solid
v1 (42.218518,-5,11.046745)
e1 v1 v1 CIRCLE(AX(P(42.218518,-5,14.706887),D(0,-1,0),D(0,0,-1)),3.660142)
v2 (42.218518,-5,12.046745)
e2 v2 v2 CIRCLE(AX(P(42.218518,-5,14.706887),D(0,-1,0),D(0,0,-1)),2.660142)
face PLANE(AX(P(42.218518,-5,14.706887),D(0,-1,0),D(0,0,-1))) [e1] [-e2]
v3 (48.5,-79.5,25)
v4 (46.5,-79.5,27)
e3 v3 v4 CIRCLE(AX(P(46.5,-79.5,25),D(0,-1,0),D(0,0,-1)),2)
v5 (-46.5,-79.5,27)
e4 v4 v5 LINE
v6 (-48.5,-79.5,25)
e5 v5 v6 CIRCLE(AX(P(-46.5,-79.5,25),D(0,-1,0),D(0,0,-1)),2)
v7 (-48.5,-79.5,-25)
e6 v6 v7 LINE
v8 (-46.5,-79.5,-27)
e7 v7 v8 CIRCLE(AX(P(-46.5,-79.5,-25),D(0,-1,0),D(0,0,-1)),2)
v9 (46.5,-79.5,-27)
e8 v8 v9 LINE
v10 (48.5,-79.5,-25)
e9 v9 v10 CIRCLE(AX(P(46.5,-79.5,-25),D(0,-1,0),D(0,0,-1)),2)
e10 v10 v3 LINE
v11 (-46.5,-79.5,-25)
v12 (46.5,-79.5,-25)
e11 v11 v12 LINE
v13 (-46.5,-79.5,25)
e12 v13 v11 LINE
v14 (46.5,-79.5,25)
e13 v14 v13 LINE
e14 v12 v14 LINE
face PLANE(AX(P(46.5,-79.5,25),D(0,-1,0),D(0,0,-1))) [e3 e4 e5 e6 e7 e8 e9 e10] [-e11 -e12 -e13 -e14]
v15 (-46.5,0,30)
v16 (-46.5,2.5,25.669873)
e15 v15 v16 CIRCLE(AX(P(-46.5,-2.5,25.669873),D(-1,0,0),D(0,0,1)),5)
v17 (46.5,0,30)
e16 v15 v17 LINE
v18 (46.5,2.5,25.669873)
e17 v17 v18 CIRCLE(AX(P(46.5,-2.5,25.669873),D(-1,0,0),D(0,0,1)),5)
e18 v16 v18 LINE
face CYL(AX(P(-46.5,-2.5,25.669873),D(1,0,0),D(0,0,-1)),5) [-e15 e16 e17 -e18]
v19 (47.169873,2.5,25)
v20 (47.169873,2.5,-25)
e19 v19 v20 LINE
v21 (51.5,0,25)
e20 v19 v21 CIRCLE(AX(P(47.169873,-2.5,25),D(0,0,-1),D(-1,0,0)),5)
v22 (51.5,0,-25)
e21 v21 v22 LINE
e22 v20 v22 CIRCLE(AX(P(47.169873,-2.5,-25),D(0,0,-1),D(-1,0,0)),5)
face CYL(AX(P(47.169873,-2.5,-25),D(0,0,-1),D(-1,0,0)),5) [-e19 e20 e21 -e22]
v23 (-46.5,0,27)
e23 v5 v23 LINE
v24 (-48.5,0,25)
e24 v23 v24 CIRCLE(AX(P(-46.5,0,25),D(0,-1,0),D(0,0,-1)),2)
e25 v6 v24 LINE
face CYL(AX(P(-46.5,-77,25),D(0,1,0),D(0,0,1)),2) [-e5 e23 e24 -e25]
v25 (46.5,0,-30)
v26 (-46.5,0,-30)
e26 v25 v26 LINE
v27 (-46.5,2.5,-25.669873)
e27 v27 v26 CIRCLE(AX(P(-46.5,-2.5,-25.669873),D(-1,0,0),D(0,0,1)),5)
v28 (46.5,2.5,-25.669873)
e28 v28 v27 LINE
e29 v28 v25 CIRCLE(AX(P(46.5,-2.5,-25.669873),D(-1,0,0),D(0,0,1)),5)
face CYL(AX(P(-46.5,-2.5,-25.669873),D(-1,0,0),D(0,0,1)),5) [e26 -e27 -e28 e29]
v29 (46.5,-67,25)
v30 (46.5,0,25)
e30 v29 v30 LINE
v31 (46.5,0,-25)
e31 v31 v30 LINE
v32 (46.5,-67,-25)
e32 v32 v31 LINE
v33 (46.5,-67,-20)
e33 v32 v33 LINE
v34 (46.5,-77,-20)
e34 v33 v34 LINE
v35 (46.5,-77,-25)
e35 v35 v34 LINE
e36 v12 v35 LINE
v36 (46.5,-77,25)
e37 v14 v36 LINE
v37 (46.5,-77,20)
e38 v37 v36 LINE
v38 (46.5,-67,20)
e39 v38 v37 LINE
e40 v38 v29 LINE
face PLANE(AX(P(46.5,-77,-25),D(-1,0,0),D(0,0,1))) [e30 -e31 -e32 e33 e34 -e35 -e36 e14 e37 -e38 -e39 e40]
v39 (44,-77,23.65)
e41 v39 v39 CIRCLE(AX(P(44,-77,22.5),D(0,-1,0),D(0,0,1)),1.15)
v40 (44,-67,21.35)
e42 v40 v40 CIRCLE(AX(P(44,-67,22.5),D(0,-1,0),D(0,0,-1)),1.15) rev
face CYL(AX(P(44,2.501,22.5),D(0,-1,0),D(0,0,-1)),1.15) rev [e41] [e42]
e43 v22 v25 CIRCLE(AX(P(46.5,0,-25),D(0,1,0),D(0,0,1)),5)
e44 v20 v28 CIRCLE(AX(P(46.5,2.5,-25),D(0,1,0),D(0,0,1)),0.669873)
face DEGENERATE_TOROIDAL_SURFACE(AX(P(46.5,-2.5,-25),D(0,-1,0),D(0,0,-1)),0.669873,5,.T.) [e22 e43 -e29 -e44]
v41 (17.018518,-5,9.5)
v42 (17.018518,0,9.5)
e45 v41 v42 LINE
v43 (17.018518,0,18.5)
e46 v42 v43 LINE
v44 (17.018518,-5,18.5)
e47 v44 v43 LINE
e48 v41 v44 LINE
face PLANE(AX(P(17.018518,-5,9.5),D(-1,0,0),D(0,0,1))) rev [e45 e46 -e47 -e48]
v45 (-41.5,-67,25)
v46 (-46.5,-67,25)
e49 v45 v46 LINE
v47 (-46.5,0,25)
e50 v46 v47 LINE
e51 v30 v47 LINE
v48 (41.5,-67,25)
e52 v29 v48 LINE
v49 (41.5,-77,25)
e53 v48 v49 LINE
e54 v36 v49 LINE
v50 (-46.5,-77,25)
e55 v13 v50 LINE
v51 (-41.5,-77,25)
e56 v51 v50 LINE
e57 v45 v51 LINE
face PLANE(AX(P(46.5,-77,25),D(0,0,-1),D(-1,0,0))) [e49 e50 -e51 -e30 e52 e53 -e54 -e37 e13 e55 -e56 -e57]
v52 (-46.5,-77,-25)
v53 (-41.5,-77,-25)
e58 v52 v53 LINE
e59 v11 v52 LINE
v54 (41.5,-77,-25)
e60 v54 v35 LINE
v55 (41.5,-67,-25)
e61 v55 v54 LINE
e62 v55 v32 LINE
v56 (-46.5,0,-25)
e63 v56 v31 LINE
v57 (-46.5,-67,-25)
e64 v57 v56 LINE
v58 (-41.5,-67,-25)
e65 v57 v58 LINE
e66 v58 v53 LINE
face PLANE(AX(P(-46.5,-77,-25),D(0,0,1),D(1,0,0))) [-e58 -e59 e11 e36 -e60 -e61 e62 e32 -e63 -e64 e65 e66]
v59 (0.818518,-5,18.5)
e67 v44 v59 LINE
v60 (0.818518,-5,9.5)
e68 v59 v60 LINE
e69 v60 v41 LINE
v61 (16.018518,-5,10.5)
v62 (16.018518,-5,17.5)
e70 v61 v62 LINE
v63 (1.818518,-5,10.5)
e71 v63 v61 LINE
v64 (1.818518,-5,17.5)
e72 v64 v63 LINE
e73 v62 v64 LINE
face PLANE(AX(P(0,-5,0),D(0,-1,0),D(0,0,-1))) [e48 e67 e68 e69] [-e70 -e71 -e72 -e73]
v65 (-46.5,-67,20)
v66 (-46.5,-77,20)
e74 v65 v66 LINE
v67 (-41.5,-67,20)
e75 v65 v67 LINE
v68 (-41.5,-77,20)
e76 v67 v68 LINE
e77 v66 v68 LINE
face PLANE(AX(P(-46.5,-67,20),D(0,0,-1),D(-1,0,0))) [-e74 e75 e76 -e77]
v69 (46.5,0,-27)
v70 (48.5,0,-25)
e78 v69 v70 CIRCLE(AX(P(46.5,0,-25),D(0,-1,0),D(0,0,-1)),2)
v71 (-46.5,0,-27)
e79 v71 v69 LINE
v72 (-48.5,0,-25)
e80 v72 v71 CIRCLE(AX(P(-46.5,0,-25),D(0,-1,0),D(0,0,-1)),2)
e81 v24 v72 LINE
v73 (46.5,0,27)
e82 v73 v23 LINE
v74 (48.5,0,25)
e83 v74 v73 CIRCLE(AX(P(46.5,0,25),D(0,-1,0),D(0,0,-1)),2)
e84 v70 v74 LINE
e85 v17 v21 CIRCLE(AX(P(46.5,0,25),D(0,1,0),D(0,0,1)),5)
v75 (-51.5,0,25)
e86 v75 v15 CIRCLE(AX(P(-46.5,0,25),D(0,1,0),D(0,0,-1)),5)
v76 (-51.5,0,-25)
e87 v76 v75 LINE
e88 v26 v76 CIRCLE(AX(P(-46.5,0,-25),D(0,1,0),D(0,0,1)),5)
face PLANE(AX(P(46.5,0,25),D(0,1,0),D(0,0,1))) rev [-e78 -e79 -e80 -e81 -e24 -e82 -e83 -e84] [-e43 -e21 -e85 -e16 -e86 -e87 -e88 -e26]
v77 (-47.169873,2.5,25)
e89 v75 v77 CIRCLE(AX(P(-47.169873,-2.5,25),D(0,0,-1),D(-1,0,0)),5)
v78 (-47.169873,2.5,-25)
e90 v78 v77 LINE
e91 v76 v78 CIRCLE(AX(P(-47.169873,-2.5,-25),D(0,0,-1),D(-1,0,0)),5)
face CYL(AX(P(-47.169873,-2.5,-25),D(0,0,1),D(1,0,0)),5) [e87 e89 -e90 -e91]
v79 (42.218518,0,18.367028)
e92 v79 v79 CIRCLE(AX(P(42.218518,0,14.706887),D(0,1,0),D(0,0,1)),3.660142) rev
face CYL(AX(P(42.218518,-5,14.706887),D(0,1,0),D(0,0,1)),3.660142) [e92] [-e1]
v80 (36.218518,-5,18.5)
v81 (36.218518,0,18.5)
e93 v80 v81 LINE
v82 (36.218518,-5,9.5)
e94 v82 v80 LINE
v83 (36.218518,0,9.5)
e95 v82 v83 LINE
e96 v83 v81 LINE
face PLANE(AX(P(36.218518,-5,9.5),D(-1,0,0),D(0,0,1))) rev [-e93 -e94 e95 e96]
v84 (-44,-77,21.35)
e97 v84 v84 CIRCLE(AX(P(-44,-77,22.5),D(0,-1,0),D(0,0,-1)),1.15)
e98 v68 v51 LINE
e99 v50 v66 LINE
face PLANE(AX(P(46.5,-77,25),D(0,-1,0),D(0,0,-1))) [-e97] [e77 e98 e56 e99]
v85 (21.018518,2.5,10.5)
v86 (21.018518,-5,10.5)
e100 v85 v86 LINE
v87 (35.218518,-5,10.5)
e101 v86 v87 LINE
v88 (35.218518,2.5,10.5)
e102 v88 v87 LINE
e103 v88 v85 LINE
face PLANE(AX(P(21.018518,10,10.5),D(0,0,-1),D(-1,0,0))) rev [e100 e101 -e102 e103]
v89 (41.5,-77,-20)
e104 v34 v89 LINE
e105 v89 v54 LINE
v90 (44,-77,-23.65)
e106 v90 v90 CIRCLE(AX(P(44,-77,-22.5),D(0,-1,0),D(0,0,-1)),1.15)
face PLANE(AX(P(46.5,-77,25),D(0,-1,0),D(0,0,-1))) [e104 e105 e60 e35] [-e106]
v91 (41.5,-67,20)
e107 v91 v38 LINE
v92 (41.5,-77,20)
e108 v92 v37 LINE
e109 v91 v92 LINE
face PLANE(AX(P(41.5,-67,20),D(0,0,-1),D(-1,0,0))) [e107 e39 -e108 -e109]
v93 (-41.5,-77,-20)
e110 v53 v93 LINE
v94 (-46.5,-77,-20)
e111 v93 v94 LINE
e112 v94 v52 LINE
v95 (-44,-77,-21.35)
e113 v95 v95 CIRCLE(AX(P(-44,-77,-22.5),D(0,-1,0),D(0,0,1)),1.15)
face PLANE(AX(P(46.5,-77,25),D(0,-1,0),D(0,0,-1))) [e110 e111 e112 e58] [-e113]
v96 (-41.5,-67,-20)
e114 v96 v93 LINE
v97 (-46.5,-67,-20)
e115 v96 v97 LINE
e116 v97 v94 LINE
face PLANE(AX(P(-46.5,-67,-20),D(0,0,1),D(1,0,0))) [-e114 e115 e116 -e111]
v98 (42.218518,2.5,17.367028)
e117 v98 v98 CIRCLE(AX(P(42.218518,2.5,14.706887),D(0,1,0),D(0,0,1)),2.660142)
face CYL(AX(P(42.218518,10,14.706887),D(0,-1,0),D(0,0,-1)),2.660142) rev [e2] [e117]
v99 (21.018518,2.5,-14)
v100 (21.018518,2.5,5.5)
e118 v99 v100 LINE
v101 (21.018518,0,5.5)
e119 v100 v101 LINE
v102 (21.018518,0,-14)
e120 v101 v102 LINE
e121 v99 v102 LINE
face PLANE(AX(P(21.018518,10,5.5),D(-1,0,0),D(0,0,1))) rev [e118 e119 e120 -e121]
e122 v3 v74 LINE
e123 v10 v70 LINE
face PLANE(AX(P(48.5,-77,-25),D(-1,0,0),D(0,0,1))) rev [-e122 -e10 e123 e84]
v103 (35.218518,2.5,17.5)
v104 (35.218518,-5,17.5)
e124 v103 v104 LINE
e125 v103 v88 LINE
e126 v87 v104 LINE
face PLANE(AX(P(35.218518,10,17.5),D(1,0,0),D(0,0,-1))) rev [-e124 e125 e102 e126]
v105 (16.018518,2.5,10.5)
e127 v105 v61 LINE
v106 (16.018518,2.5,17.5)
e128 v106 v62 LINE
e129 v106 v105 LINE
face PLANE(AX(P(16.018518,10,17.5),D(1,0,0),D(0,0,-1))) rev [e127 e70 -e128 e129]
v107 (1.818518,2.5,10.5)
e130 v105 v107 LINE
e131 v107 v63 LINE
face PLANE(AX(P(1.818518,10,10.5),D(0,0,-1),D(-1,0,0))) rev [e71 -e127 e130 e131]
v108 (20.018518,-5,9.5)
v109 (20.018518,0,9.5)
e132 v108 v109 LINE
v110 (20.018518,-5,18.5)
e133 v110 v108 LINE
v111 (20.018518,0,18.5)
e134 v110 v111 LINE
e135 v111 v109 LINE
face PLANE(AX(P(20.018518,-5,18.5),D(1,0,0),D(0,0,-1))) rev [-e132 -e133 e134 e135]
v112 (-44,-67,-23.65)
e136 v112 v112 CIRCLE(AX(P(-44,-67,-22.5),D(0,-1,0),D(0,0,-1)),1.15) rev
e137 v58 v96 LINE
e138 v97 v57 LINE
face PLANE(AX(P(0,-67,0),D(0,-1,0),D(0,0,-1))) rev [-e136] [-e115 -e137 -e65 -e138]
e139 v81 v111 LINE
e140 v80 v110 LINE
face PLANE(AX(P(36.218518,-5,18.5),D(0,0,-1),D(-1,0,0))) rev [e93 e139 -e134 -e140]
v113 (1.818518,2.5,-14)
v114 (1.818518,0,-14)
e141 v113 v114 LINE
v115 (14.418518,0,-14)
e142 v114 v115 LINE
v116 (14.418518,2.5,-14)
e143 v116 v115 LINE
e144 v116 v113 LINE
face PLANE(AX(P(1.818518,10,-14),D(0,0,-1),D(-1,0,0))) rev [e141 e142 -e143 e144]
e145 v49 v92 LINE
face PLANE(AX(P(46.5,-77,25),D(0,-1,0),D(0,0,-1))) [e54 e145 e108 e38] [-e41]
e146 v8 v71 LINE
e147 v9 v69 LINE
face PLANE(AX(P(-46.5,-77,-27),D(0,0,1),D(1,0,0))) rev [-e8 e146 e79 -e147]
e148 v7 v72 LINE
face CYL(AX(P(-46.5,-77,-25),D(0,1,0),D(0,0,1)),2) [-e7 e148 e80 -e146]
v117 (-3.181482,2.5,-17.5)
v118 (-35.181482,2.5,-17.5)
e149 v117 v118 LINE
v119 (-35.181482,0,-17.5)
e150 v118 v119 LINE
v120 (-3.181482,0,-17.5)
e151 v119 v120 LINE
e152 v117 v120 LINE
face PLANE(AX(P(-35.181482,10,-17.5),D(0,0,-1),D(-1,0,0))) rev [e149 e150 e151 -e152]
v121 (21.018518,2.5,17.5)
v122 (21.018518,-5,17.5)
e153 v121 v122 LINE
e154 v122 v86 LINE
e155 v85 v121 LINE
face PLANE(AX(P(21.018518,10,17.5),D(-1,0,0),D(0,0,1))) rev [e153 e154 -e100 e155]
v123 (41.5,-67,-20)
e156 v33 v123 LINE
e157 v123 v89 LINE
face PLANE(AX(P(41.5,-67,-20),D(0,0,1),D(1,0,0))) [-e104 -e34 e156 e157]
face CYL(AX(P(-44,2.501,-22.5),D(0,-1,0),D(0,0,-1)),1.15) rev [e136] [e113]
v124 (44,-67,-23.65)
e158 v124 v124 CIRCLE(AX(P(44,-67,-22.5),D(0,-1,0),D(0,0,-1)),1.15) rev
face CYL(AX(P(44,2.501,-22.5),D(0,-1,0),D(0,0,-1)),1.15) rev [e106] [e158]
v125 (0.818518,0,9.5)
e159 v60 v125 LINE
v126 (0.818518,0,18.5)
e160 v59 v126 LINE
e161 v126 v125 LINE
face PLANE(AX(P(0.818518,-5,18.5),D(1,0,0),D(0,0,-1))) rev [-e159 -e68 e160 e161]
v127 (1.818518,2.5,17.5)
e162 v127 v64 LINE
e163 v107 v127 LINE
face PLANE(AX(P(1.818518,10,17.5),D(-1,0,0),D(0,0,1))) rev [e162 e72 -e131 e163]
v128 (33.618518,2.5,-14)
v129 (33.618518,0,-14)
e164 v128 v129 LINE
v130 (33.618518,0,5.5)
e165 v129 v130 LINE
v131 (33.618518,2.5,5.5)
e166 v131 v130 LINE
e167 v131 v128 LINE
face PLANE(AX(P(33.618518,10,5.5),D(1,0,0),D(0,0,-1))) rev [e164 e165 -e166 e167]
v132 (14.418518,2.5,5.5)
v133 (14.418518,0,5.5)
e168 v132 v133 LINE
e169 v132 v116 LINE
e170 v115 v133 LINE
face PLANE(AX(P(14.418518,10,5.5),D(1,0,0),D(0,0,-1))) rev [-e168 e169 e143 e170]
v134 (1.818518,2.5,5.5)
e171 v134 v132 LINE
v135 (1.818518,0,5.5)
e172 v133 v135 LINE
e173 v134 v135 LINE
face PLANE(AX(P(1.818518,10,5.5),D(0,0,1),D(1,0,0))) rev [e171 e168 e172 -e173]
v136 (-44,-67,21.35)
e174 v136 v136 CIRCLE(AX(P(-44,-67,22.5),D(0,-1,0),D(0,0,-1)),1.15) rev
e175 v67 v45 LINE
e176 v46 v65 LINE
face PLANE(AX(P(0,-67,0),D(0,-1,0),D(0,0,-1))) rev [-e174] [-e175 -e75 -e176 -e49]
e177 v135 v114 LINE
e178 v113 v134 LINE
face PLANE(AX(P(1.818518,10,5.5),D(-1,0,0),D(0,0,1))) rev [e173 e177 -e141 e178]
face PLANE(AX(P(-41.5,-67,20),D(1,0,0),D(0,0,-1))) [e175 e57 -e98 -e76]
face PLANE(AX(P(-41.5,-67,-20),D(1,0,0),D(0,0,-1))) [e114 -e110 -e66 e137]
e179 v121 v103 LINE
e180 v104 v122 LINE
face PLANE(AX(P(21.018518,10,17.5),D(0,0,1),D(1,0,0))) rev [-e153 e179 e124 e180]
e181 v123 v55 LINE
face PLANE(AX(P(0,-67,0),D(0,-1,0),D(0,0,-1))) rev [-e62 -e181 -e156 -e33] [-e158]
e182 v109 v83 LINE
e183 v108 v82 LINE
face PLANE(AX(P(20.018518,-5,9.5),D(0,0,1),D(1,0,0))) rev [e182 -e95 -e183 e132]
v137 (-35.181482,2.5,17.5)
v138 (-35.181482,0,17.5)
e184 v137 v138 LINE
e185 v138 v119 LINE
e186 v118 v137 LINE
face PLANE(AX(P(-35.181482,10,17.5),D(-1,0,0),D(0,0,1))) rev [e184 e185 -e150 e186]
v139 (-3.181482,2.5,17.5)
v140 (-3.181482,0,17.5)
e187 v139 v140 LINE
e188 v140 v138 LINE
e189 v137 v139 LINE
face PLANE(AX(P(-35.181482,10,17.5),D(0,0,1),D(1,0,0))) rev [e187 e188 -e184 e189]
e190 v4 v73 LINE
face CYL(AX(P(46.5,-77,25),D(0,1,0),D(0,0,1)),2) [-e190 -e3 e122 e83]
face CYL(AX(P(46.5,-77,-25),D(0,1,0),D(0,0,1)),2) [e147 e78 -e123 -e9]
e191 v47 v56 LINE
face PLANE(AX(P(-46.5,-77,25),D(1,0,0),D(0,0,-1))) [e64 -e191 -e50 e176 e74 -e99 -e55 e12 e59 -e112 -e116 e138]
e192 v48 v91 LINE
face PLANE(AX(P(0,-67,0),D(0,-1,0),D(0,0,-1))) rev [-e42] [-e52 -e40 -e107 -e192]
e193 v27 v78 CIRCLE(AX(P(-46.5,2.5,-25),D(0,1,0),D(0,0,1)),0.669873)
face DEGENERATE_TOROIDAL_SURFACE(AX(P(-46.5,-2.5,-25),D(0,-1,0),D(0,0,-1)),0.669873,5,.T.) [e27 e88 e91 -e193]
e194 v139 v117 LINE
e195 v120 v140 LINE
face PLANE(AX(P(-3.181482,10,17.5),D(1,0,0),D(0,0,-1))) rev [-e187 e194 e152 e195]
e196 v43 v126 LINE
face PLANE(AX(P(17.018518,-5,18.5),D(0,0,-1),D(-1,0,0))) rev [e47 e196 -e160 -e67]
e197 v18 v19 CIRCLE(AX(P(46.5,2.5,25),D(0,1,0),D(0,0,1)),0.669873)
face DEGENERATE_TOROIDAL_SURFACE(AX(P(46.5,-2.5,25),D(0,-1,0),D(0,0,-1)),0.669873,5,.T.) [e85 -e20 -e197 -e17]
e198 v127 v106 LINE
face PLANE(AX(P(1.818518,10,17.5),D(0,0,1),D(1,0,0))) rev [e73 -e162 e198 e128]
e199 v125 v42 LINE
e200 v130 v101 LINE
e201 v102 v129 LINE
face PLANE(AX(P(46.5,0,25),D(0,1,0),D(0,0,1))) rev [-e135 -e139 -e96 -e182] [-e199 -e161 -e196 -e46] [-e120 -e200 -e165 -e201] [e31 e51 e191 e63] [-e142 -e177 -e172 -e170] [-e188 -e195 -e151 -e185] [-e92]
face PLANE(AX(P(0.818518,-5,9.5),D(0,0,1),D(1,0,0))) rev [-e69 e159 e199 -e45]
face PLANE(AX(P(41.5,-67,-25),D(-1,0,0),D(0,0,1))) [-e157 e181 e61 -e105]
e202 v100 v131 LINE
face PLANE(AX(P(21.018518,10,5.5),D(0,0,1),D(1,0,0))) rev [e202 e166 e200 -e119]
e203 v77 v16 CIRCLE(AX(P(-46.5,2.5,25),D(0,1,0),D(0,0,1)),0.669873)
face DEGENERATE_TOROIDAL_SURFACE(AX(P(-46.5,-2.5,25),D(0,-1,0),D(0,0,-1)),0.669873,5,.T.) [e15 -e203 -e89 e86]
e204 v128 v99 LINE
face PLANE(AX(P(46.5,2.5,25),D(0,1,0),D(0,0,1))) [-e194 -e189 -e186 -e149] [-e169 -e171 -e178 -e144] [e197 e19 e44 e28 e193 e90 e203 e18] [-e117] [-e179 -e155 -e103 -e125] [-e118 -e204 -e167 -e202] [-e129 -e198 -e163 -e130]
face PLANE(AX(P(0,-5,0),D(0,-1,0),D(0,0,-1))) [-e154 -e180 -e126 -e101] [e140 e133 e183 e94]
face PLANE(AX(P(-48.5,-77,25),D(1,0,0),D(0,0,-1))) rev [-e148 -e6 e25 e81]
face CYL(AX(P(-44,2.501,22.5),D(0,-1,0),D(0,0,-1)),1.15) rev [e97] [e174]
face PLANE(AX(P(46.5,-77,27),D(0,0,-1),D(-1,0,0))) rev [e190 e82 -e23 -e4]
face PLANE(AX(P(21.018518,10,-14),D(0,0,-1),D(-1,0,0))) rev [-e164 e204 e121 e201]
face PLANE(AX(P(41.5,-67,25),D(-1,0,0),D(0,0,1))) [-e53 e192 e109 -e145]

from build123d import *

# Parameters (mm, degrees)
BOSS_EXTRUDE1_DEPTH = 2.5
FILLET1_R           = 5
SKETCH2_W           = 93
SKETCH2_H           = 50
BOSS_EXTRUDE2_DEPTH = 77
SKETCH8_R           = 2.660141884
SKETCH8_W           = 32
SKETCH8_H           = 35
SKETCH8_W_2         = 14.2
SKETCH8_H_2         = 7
SKETCH8_W_3         = 12.6
SKETCH8_H_3         = 19.5
CUT_EXTRUDE3_DEPTH  = 10
BOSS_EXTRUDE4_START = 5
SKETCH9_R           = 3.660141884
SKETCH9_R_2         = 2.660141884
SKETCH9_W           = 16.2
SKETCH9_H           = 9
SKETCH9_W_2         = 14.2
SKETCH9_H_2         = 7
BOSS_EXTRUDE4_DEPTH = 5
SKETCH10_W          = 5
SKETCH10_H          = 5
BOSS_EXTRUDE5_DEPTH = 10
SKETCH11_W          = 93
SKETCH11_H          = 50
BOSS_EXTRUDE6_DEPTH = 2.5
CUT_EXTRUDE4_REACH  = 101.36
SKETCH12_R          = 1.15


with BuildPart() as part:
    # Sketch1 → Boss-Extrude1 (new body)
    with BuildSketch(Plane(origin=(0, 0, 0), x_dir=(1, 0, 0), z_dir=(0, 1, 0))):
        with BuildLine():
            Line((-46.5, 30), (46.5, 30))
            ThreePointArc((46.5, 30), (50.035533906, 28.535533906), (51.5, 25))
            Line((51.5, 25), (51.5, -25))
            ThreePointArc((51.5, -25), (50.035533906, -28.535533906), (46.5, -30))
            Line((46.5, -30), (-46.5, -30))
            ThreePointArc((-46.5, -30), (-50.035533906, -28.535533906), (-51.5, -25))
            Line((-51.5, -25), (-51.5, 25))
            ThreePointArc((-51.5, 25), (-50.035533906, 28.535533906), (-46.5, 30))
        make_face()
    extrude(amount=BOSS_EXTRUDE1_DEPTH)

    # Fillet1
    # the kernel refuses this fillet: 5 mm, written as the material it takes off along each edge
    with BuildSketch(Plane(origin=(-46.5, 2.5, -25), x_dir=(-1, 0, 0), z_dir=(0, 0, 1))) as fillet1_piece_1:
        with BuildLine():
            CenterArc((0.669872981, 5), FILLET1_R, 270, 60)
            Line((0.669872981, 0), (0.669872981, -0.1))
            Line((0.669872981, -0.1), (5, -0.1))
            Line((5, -0.1), (5.1, 0))
            ThreePointArc((5.1, 0), (5.1, 1.25), (5.08660254, 2.45))
            Line((5.08660254, 2.45), (5, 2.5))
        make_face()
    revolve(axis=Axis((-46.5, 2.5, -25), (0, -1, 0)), revolution_arc=90, mode=Mode.SUBTRACT)
    with BuildSketch(Plane(origin=(-46.5, 2.5, -30), x_dir=(0, -1, 0), z_dir=(1, 0, 0)), Plane(origin=(46.5, 2.5, 30), x_dir=(0, -1, 0), z_dir=(-1, 0, 0))) as fillet1_piece_2:
        with BuildLine():
            CenterArc((5, -4.330127019), FILLET1_R, 120, 60)
            Line((0, -4.330127019), (-0.1, -4.330127019))
            Line((-0.1, -4.330127019), (-0.1, 0))
            Line((-0.1, 0), (0, 0.1))
            ThreePointArc((0, 0.1), (1.25, 0.1), (2.45, 0.08660254))
            Line((2.45, 0.08660254), (2.5, 0))
        make_face()
    extrude(amount=93, mode=Mode.SUBTRACT)
    with BuildSketch(Plane(origin=(46.5, 2.5, -25), x_dir=(0, 0, -1), z_dir=(-1, 0, 0))) as fillet1_piece_3:
        with BuildLine():
            CenterArc((0.669872981, 5), FILLET1_R, 270, 60)
            Line((0.669872981, 0), (0.669872981, -0.1))
            Line((0.669872981, -0.1), (5, -0.1))
            Line((5, -0.1), (5.1, 0))
            ThreePointArc((5.1, 0), (5.1, 1.25), (5.08660254, 2.45))
            Line((5.08660254, 2.45), (5, 2.5))
        make_face()
    revolve(axis=Axis((46.5, 2.5, -25), (0, -1, 0)), revolution_arc=90, mode=Mode.SUBTRACT)
    with BuildSketch(Plane(origin=(51.5, 2.5, -25), x_dir=(0, -1, 0), z_dir=(0, 0, 1)), Plane(origin=(-51.5, 2.5, 25), x_dir=(0, -1, 0), z_dir=(0, 0, -1))) as fillet1_piece_4:
        with BuildLine():
            CenterArc((5, -4.330127019), FILLET1_R, 120, 60)
            Line((0, -4.330127019), (-0.1, -4.330127019))
            Line((-0.1, -4.330127019), (-0.1, 0))
            Line((-0.1, 0), (0, 0.1))
            ThreePointArc((0, 0.1), (1.25, 0.1), (2.45, 0.08660254))
            Line((2.45, 0.08660254), (2.5, 0))
        make_face()
    extrude(amount=50, mode=Mode.SUBTRACT)
    with BuildSketch(Plane(origin=(46.5, 2.5, 25), x_dir=(1, 0, 0), z_dir=(0, 0, -1))) as fillet1_piece_5:
        with BuildLine():
            CenterArc((0.669872981, 5), FILLET1_R, 270, 60)
            Line((0.669872981, 0), (0.669872981, -0.1))
            Line((0.669872981, -0.1), (5, -0.1))
            Line((5, -0.1), (5.1, 0))
            ThreePointArc((5.1, 0), (5.1, 1.25), (5.08660254, 2.45))
            Line((5.08660254, 2.45), (5, 2.5))
        make_face()
    revolve(axis=Axis((46.5, 2.5, 25), (0, -1, 0)), revolution_arc=90, mode=Mode.SUBTRACT)
    with BuildSketch(Plane(origin=(-46.5, 2.5, 25), x_dir=(0, 0, 1), z_dir=(1, 0, 0))) as fillet1_piece_6:
        with BuildLine():
            CenterArc((0.669872981, 5), FILLET1_R, 270, 60)
            Line((0.669872981, 0), (0.669872981, -0.1))
            Line((0.669872981, -0.1), (5, -0.1))
            Line((5, -0.1), (5.1, 0))
            ThreePointArc((5.1, 0), (5.1, 1.25), (5.08660254, 2.45))
            Line((5.08660254, 2.45), (5, 2.5))
        make_face()
    revolve(axis=Axis((-46.5, 2.5, 25), (0, -1, 0)), revolution_arc=90, mode=Mode.SUBTRACT)

    # Sketch2 → Boss-Extrude2 (add)
    with BuildSketch(Plane.XZ):
        with BuildLine():
            Line((48.5, -25), (48.5, 25))
            ThreePointArc((48.5, 25), (47.914213562, 26.414213562), (46.5, 27))
            Line((46.5, 27), (-46.5, 27))
            ThreePointArc((-46.5, 27), (-47.914213562, 26.414213562), (-48.5, 25))
            Line((-48.5, 25), (-48.5, -25))
            ThreePointArc((-48.5, -25), (-47.914213562, -26.414213562), (-46.5, -27))
            Line((-46.5, -27), (46.5, -27))
            ThreePointArc((46.5, -27), (47.914213562, -26.414213562), (48.5, -25))
        make_face()
        Rectangle(SKETCH2_W, SKETCH2_H, mode=Mode.SUBTRACT)
    extrude(amount=BOSS_EXTRUDE2_DEPTH)

    # Sketch8 → Cut-Extrude3 (cut)
    with BuildSketch(Plane.XZ):
        with Locations(Location((42.218517518, 14.706886542, 0), (0, 0, 270))):
            Circle(SKETCH8_R)
        with Locations((-19.181482482, 0)):
            Rectangle(SKETCH8_W, SKETCH8_H)
        with Locations((8.918517518, 14)):
            Rectangle(SKETCH8_W_2, SKETCH8_H_2)
        with Locations((28.118517518, 14)):
            Rectangle(SKETCH8_W_2, SKETCH8_H_2)
        with Locations((8.118517518, -4.25)):
            Rectangle(SKETCH8_W_3, SKETCH8_H_3)
        with Locations((27.318517518, -4.25)):
            Rectangle(SKETCH8_W_3, SKETCH8_H_3)
    extrude(amount=-CUT_EXTRUDE3_DEPTH, mode=Mode.SUBTRACT)

    # Sketch9 → Boss-Extrude4 (add)
    # profile 1 of 3: a face of its own
    with BuildSketch(Plane.XZ.offset(BOSS_EXTRUDE4_START)):
        with Locations(Location((42.218517518, 14.706886542, 0), (0, 0, 90))):
            Circle(SKETCH9_R)
        with Locations(Location((42.218517518, 14.706886542, 0), (0, 0, 270))):
            Circle(SKETCH9_R_2, mode=Mode.SUBTRACT)
    # profile 2 of 3: a face of its own
    with BuildSketch(Plane.XZ.offset(BOSS_EXTRUDE4_START)):
        with Locations((8.918517518, 14)):
            Rectangle(SKETCH9_W, SKETCH9_H)
        with Locations((8.918517518, 14)):
            Rectangle(SKETCH9_W_2, SKETCH9_H_2, mode=Mode.SUBTRACT)
    # profile 3 of 3: a face of its own
    with BuildSketch(Plane.XZ.offset(BOSS_EXTRUDE4_START)):
        with Locations((28.118517518, 14)):
            Rectangle(SKETCH9_W, SKETCH9_H)
        with Locations((28.118517518, 14)):
            Rectangle(SKETCH9_W_2, SKETCH9_H_2, mode=Mode.SUBTRACT)
    extrude(amount=-BOSS_EXTRUDE4_DEPTH)

    # Sketch10 → Boss-Extrude5 (add)
    with BuildSketch(Plane.XZ.offset(77)):
        with Locations((44, 22.5)):
            Rectangle(SKETCH10_W, SKETCH10_H)
        with Locations((-44, 22.5)):
            Rectangle(SKETCH10_W, SKETCH10_H)
        with Locations((-44, -22.5)):
            Rectangle(SKETCH10_W, SKETCH10_H)
        with Locations((44, -22.5)):
            Rectangle(SKETCH10_W, SKETCH10_H)
    extrude(amount=-BOSS_EXTRUDE5_DEPTH)

    # Sketch11 → Boss-Extrude6 (add)
    with BuildSketch(Plane.XZ.offset(77)):
        with BuildLine():
            Line((46.5, 27), (-46.5, 27))
            ThreePointArc((-46.5, 27), (-47.914213562, 26.414213562), (-48.5, 25))
            Line((-48.5, 25), (-48.5, -25))
            ThreePointArc((-48.5, -25), (-47.914213562, -26.414213562), (-46.5, -27))
            Line((-46.5, -27), (46.5, -27))
            ThreePointArc((46.5, -27), (47.914213562, -26.414213562), (48.5, -25))
            Line((48.5, -25), (48.5, 25))
            ThreePointArc((48.5, 25), (47.914213562, 26.414213562), (46.5, 27))
        make_face()
        Rectangle(SKETCH11_W, SKETCH11_H, mode=Mode.SUBTRACT)
    extrude(amount=BOSS_EXTRUDE6_DEPTH)

    # Sketch12 → Cut-Extrude4 (cut, up to next)
    with BuildSketch(Plane.XZ.offset(77), mode=Mode.PRIVATE) as cut_extrude4_sk1:
        with Locations(Location((-44, 22.5, 0), (0, 0, 270))):
            Circle(SKETCH12_R)
    cut_extrude4_tool1 = extrude(cut_extrude4_sk1.sketch, amount=-CUT_EXTRUDE4_REACH, mode=Mode.PRIVATE) & part.part
    # Sketch12 → Cut-Extrude4 (cut, up to next)
    with BuildSketch(Plane.XZ.offset(77), mode=Mode.PRIVATE) as cut_extrude4_sk2:
        with Locations(Location((44, 22.5, 0), (0, 0, 270))):
            Circle(SKETCH12_R)
    cut_extrude4_tool2 = extrude(cut_extrude4_sk2.sketch, amount=-CUT_EXTRUDE4_REACH, mode=Mode.PRIVATE) & part.part
    # Sketch12 → Cut-Extrude4 (cut, up to next)
    with BuildSketch(Plane.XZ.offset(77), mode=Mode.PRIVATE) as cut_extrude4_sk3:
        with Locations(Location((44, -22.5, 0), (0, 0, 270))):
            Circle(SKETCH12_R)
    cut_extrude4_tool3 = extrude(cut_extrude4_sk3.sketch, amount=-CUT_EXTRUDE4_REACH, mode=Mode.PRIVATE) & part.part
    # Sketch12 → Cut-Extrude4 (cut, up to next)
    with BuildSketch(Plane.XZ.offset(77), mode=Mode.PRIVATE) as cut_extrude4_sk4:
        with Locations(Location((-44, -22.5, 0), (0, 0, 270))):
            Circle(SKETCH12_R)
    cut_extrude4_tool4 = extrude(cut_extrude4_sk4.sketch, amount=-CUT_EXTRUDE4_REACH, mode=Mode.PRIVATE) & part.part
    add(cut_extrude4_tool1.solids().sort_by_distance((-44, -77, 22.5))[0], mode=Mode.SUBTRACT)
    add(cut_extrude4_tool2.solids().sort_by_distance((44, -77, 22.5))[0], mode=Mode.SUBTRACT)
    add(cut_extrude4_tool3.solids().sort_by_distance((44, -77, -22.5))[0], mode=Mode.SUBTRACT)
    add(cut_extrude4_tool4.solids().sort_by_distance((-44, -77, -22.5))[0], mode=Mode.SUBTRACT)


solid = part.part
